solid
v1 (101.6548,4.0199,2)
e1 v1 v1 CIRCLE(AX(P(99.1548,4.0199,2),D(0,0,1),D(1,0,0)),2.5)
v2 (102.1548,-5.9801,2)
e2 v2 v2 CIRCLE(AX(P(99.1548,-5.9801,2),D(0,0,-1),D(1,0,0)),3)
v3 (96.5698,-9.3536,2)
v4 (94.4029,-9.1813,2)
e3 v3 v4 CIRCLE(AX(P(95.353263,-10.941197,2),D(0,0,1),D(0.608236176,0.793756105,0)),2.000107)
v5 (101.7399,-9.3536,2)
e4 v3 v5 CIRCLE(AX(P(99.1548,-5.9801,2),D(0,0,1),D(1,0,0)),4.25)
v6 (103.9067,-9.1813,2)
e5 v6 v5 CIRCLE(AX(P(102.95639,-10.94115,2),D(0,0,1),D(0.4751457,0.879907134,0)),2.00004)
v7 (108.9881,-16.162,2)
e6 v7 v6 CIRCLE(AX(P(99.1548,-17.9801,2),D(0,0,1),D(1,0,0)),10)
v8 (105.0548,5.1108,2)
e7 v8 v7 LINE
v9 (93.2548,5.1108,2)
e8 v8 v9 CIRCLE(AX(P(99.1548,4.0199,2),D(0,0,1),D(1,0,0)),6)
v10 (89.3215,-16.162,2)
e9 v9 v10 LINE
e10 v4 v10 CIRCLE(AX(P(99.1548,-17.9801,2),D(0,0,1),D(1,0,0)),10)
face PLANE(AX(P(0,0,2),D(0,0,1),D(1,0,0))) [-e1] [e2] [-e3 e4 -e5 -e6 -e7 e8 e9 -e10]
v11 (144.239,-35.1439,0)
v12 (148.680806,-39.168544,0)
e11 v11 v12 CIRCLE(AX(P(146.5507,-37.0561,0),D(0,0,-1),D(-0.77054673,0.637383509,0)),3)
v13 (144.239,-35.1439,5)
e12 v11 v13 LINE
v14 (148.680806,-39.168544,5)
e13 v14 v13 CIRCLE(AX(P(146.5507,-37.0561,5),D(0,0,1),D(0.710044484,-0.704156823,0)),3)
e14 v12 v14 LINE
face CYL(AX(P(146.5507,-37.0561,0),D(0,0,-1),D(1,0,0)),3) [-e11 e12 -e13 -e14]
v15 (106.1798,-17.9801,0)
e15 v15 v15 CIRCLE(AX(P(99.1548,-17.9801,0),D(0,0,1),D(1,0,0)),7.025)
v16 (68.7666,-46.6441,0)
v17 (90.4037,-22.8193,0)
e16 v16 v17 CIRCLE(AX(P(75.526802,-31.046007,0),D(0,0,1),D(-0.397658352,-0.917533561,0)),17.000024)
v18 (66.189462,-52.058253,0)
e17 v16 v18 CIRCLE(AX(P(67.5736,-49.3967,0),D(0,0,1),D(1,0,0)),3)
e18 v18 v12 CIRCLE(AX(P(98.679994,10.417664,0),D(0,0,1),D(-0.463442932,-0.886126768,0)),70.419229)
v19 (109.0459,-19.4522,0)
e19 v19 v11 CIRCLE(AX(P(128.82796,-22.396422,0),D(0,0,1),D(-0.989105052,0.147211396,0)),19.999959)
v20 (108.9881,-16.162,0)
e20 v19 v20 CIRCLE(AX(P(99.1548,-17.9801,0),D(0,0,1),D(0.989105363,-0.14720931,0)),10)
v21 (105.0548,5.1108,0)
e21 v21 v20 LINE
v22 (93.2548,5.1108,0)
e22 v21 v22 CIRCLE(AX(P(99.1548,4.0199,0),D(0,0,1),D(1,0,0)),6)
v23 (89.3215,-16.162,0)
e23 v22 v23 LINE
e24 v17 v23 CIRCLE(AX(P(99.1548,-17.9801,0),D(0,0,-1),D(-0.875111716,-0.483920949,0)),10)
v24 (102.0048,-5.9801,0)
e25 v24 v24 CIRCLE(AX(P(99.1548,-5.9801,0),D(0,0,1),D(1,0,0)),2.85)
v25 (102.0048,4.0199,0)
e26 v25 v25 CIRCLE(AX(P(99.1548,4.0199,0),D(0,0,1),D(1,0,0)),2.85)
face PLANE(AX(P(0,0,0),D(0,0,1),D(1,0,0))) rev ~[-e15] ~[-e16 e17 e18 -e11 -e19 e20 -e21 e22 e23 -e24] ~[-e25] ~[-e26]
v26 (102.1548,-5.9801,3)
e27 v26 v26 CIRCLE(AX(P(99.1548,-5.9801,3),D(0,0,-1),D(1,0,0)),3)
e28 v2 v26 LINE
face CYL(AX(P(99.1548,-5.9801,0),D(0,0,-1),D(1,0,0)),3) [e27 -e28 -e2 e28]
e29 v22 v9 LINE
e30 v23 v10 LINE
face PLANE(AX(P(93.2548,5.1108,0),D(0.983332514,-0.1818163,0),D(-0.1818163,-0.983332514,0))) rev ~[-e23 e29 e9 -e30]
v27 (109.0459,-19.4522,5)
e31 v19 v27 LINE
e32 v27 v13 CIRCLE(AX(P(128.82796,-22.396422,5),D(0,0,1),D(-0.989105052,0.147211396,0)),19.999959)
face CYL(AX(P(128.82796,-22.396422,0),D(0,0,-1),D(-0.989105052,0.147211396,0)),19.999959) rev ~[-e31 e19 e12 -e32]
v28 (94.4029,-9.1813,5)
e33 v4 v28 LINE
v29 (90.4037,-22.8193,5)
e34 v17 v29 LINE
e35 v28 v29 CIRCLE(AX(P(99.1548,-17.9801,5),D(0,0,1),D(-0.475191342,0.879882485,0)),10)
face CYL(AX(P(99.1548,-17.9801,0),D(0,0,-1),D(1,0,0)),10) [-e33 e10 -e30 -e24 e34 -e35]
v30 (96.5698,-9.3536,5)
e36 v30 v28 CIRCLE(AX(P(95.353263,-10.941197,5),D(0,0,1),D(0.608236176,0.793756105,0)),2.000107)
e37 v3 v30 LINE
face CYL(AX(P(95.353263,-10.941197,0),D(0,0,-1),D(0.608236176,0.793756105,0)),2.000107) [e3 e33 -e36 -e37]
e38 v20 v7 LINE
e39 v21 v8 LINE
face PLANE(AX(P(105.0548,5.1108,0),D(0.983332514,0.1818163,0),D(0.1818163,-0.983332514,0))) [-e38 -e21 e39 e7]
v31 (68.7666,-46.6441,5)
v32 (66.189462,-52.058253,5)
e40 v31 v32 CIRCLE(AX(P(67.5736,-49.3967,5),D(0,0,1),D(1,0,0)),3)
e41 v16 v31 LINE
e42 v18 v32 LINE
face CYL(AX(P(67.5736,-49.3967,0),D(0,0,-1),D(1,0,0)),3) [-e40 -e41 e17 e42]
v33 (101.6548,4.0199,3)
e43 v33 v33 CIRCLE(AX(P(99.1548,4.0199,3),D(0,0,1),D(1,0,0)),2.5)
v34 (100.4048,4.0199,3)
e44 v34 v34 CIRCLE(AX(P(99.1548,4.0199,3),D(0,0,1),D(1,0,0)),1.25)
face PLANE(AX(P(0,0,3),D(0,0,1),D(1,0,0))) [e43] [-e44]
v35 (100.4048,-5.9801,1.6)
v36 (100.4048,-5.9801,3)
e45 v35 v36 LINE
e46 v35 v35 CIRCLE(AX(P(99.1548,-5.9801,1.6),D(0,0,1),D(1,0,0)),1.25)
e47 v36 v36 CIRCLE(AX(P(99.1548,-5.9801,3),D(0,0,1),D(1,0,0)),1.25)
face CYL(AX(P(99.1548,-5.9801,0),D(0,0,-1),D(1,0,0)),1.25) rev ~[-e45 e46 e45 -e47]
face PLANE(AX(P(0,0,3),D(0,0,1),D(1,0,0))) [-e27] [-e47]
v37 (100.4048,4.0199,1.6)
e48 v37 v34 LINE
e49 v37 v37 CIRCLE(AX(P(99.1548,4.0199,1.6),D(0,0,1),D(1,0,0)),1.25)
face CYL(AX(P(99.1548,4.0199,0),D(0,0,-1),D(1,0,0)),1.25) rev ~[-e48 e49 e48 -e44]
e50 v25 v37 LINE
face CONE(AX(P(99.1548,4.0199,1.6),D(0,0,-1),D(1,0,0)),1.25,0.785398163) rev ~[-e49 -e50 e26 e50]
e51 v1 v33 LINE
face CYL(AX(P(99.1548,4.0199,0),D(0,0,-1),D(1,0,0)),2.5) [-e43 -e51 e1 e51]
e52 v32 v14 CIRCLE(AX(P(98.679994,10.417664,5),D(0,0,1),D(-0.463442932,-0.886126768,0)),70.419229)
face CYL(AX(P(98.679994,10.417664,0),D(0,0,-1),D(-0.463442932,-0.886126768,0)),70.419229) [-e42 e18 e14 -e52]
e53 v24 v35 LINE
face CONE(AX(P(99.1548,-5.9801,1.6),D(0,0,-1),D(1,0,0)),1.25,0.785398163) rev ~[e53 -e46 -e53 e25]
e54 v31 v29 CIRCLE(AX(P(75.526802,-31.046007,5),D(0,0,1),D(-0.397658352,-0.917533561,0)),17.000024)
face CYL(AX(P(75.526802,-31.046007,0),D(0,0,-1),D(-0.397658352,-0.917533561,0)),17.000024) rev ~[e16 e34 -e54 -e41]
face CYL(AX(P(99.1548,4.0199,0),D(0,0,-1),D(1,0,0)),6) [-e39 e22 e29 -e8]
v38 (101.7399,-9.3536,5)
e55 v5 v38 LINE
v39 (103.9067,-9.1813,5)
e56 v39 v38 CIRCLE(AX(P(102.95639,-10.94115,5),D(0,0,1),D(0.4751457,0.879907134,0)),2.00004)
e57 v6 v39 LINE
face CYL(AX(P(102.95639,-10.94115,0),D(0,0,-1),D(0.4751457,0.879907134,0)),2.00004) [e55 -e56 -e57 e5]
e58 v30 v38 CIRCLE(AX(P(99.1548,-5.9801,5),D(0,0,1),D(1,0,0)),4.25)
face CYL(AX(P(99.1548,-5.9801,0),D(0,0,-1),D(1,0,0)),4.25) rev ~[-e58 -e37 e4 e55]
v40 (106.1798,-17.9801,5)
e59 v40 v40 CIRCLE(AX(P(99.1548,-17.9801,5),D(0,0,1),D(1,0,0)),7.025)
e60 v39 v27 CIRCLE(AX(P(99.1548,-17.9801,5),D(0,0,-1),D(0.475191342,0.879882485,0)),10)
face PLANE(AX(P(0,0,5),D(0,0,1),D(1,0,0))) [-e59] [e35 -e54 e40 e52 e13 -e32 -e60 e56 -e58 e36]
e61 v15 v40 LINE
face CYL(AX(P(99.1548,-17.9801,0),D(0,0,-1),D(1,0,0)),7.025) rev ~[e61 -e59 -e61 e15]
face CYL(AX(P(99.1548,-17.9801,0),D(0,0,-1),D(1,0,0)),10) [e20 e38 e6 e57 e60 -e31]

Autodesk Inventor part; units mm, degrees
ref_plane "YZ Plane" through (0, 0, 0) normal (1, 0, 0) x (0, 1, 0)
ref_plane "XZ Plane" through (0, 0, 0) normal (0, 1, 0) x (-1, 0, 0)
ref_plane "XY Plane" through (0, 0, 0) normal (0, 0, 1) x (1, 0, 0)
sketch "Sketch1" plane through (0, 0, 0) normal (0, 0, 1) x (1, 0, 0)
  line L0 (64.2929, 13) -> (99.1548, 4.0199) construction
  circle A0 centre (64.2929, 13) radius 3 construction
  circle A1 centre (64.2929, 13) radius 4.025 construction
  circle A2 centre (64.2929, 13) radius 7 construction
  arc A3 (102.6474, 8.8986) -> (63.8399, 19.9853) centre (67.7221, -39.8889) ccw construction
  circle A4 centre (99.1548, 4.0199) radius 2.5
  circle A5 centre (99.1548, 4.0199) radius 3.525
  circle A6 centre (99.1548, 4.0199) radius 6
  line L1 (64.2929, 13) -> (98.9408, 0.0186) construction
  line L2 (99.1548, 4.0199) -> (99.1548, -17.9801) construction
  line L3 (99.1548, -17.9801) -> (98.9408, 0.0186) construction
  circle A7 centre (99.1548, -17.9801) radius 10
  circle A8 centre (99.1548, -17.9801) radius 7.025
  line L4 (105.0548, 5.1108) -> (108.9881, -16.162)
  line L5 (93.2548, 5.1108) -> (89.3215, -16.162)
  line L6 (9.3628, -60) -> (214.5663, -60) construction
  arc A9 (95.4028, -0.6623) -> (65.8301, 6.1709) centre (73.5161, -27.9748) ccw construction
  line L7 (99.1548, 4.0199) -> (66.0447, -51.9827) construction
  line L8 (99.1548, 4.0199) -> (148.8226, -39.0251) construction
  circle A10 centre (67.5736, -49.3967) radius 3
  circle A11 centre (146.5507, -37.0561) radius 3
  arc A12 (68.7666, -46.6441) -> (90.4037, -22.8193) centre (75.5268, -31.046) ccw
  arc A13 (109.0459, -19.4522) -> (144.239, -35.1439) centre (128.828, -22.3964) ccw
  arc A14 (66.0447, -51.9827) -> (148.8226, -39.0251) centre (98.68, 10.4177) ccw
  circle A15 centre (99.1548, -5.9801) radius 1.25
  circle A16 centre (99.1548, -5.9801) radius 3
  circle A17 centre (99.1548, -5.9801) radius 4.25
  circle A18 centre (99.1548, 4.0199) radius 1.25
  arc A19 (103.9067, -9.1813) -> (101.7399, -9.3536) centre (102.9564, -10.9411) ccw
  arc A20 (96.5698, -9.3536) -> (94.4029, -9.1813) centre (95.3533, -10.9411) ccw
  point P0 (0, 0)
  point P1 (0, 0)
  point P2 (66.1895, -52.0583)
  point P3 (148.6808, -39.1685)
  point P4 (97.1242, -8.1885)
  point P5 (102.5276, -8.5661)
  point P6 (95.7821, -8.5661)
  dimension "d19" = 6
  dimension "d20" = 6
  dimension "d0" = 36
  dimension "d1" = 8.05
  dimension "d2" = 6
  dimension "d3" = 14
  dimension "d4" = 60
  dimension "d5" = 37
  dimension "d6" = 22
  dimension "d7" = 18
  dimension "d8" = 12
  dimension "d9" = 7.05
  dimension "d10" = 20
  dimension "d11" = 14.05
  dimension "d12" = 35
  dimension "d13" = 5
  dimension "d14" = 60
  dimension "d15" = 30.593
  dimension "d16" = 49.086
  dimension "d17" = 65.7249
  dimension "d18" = 65.0582
  dimension "d21" = 13
  dimension "d22" = 70.4193
  dimension "d23" = 17
  dimension "d24" = 20
  dimension "d29" = 2.5
  dimension "d30" = 6
  dimension "d31" = 8.5
  dimension "d32" = 2.5
  dimension "d43" = 10
  dimension "d44" = 2
  dimension "d45" = 2
extrude "Extrusion1" add sketch "Sketch1" along normal blind 5 contours A7 A20 A17 A19 | A7 A13 A11 A14 A10 A12 | A10 | A11
extrude "Extrusion3" add sketch "Sketch1" along normal blind 3 contours A4 | A16 A7 | A7 A16
extrude "Extrusion4" add sketch "Sketch1" along normal blind 2 contours A5 | A6 A17 | A6 L4 A7 A17 | A17 A7 A16 A6 | A6 A17 | A6 A17 A7 L5 | A19 A17 A7 | A17 A20 A7 | A7 A16 A17 | A7 A16 picked at (99.1548, -8.3289)
chamfer "Chamfer1" distance 1.6 angle 45 1 edges at (97.9048, -5.9801, 0)
chamfer "Chamfer2" distance 1.6 angle 45 1 edges at (97.9048, 4.0199, 0)
properties part number "ヘッケン" material "Polycarbonate, Clear"
